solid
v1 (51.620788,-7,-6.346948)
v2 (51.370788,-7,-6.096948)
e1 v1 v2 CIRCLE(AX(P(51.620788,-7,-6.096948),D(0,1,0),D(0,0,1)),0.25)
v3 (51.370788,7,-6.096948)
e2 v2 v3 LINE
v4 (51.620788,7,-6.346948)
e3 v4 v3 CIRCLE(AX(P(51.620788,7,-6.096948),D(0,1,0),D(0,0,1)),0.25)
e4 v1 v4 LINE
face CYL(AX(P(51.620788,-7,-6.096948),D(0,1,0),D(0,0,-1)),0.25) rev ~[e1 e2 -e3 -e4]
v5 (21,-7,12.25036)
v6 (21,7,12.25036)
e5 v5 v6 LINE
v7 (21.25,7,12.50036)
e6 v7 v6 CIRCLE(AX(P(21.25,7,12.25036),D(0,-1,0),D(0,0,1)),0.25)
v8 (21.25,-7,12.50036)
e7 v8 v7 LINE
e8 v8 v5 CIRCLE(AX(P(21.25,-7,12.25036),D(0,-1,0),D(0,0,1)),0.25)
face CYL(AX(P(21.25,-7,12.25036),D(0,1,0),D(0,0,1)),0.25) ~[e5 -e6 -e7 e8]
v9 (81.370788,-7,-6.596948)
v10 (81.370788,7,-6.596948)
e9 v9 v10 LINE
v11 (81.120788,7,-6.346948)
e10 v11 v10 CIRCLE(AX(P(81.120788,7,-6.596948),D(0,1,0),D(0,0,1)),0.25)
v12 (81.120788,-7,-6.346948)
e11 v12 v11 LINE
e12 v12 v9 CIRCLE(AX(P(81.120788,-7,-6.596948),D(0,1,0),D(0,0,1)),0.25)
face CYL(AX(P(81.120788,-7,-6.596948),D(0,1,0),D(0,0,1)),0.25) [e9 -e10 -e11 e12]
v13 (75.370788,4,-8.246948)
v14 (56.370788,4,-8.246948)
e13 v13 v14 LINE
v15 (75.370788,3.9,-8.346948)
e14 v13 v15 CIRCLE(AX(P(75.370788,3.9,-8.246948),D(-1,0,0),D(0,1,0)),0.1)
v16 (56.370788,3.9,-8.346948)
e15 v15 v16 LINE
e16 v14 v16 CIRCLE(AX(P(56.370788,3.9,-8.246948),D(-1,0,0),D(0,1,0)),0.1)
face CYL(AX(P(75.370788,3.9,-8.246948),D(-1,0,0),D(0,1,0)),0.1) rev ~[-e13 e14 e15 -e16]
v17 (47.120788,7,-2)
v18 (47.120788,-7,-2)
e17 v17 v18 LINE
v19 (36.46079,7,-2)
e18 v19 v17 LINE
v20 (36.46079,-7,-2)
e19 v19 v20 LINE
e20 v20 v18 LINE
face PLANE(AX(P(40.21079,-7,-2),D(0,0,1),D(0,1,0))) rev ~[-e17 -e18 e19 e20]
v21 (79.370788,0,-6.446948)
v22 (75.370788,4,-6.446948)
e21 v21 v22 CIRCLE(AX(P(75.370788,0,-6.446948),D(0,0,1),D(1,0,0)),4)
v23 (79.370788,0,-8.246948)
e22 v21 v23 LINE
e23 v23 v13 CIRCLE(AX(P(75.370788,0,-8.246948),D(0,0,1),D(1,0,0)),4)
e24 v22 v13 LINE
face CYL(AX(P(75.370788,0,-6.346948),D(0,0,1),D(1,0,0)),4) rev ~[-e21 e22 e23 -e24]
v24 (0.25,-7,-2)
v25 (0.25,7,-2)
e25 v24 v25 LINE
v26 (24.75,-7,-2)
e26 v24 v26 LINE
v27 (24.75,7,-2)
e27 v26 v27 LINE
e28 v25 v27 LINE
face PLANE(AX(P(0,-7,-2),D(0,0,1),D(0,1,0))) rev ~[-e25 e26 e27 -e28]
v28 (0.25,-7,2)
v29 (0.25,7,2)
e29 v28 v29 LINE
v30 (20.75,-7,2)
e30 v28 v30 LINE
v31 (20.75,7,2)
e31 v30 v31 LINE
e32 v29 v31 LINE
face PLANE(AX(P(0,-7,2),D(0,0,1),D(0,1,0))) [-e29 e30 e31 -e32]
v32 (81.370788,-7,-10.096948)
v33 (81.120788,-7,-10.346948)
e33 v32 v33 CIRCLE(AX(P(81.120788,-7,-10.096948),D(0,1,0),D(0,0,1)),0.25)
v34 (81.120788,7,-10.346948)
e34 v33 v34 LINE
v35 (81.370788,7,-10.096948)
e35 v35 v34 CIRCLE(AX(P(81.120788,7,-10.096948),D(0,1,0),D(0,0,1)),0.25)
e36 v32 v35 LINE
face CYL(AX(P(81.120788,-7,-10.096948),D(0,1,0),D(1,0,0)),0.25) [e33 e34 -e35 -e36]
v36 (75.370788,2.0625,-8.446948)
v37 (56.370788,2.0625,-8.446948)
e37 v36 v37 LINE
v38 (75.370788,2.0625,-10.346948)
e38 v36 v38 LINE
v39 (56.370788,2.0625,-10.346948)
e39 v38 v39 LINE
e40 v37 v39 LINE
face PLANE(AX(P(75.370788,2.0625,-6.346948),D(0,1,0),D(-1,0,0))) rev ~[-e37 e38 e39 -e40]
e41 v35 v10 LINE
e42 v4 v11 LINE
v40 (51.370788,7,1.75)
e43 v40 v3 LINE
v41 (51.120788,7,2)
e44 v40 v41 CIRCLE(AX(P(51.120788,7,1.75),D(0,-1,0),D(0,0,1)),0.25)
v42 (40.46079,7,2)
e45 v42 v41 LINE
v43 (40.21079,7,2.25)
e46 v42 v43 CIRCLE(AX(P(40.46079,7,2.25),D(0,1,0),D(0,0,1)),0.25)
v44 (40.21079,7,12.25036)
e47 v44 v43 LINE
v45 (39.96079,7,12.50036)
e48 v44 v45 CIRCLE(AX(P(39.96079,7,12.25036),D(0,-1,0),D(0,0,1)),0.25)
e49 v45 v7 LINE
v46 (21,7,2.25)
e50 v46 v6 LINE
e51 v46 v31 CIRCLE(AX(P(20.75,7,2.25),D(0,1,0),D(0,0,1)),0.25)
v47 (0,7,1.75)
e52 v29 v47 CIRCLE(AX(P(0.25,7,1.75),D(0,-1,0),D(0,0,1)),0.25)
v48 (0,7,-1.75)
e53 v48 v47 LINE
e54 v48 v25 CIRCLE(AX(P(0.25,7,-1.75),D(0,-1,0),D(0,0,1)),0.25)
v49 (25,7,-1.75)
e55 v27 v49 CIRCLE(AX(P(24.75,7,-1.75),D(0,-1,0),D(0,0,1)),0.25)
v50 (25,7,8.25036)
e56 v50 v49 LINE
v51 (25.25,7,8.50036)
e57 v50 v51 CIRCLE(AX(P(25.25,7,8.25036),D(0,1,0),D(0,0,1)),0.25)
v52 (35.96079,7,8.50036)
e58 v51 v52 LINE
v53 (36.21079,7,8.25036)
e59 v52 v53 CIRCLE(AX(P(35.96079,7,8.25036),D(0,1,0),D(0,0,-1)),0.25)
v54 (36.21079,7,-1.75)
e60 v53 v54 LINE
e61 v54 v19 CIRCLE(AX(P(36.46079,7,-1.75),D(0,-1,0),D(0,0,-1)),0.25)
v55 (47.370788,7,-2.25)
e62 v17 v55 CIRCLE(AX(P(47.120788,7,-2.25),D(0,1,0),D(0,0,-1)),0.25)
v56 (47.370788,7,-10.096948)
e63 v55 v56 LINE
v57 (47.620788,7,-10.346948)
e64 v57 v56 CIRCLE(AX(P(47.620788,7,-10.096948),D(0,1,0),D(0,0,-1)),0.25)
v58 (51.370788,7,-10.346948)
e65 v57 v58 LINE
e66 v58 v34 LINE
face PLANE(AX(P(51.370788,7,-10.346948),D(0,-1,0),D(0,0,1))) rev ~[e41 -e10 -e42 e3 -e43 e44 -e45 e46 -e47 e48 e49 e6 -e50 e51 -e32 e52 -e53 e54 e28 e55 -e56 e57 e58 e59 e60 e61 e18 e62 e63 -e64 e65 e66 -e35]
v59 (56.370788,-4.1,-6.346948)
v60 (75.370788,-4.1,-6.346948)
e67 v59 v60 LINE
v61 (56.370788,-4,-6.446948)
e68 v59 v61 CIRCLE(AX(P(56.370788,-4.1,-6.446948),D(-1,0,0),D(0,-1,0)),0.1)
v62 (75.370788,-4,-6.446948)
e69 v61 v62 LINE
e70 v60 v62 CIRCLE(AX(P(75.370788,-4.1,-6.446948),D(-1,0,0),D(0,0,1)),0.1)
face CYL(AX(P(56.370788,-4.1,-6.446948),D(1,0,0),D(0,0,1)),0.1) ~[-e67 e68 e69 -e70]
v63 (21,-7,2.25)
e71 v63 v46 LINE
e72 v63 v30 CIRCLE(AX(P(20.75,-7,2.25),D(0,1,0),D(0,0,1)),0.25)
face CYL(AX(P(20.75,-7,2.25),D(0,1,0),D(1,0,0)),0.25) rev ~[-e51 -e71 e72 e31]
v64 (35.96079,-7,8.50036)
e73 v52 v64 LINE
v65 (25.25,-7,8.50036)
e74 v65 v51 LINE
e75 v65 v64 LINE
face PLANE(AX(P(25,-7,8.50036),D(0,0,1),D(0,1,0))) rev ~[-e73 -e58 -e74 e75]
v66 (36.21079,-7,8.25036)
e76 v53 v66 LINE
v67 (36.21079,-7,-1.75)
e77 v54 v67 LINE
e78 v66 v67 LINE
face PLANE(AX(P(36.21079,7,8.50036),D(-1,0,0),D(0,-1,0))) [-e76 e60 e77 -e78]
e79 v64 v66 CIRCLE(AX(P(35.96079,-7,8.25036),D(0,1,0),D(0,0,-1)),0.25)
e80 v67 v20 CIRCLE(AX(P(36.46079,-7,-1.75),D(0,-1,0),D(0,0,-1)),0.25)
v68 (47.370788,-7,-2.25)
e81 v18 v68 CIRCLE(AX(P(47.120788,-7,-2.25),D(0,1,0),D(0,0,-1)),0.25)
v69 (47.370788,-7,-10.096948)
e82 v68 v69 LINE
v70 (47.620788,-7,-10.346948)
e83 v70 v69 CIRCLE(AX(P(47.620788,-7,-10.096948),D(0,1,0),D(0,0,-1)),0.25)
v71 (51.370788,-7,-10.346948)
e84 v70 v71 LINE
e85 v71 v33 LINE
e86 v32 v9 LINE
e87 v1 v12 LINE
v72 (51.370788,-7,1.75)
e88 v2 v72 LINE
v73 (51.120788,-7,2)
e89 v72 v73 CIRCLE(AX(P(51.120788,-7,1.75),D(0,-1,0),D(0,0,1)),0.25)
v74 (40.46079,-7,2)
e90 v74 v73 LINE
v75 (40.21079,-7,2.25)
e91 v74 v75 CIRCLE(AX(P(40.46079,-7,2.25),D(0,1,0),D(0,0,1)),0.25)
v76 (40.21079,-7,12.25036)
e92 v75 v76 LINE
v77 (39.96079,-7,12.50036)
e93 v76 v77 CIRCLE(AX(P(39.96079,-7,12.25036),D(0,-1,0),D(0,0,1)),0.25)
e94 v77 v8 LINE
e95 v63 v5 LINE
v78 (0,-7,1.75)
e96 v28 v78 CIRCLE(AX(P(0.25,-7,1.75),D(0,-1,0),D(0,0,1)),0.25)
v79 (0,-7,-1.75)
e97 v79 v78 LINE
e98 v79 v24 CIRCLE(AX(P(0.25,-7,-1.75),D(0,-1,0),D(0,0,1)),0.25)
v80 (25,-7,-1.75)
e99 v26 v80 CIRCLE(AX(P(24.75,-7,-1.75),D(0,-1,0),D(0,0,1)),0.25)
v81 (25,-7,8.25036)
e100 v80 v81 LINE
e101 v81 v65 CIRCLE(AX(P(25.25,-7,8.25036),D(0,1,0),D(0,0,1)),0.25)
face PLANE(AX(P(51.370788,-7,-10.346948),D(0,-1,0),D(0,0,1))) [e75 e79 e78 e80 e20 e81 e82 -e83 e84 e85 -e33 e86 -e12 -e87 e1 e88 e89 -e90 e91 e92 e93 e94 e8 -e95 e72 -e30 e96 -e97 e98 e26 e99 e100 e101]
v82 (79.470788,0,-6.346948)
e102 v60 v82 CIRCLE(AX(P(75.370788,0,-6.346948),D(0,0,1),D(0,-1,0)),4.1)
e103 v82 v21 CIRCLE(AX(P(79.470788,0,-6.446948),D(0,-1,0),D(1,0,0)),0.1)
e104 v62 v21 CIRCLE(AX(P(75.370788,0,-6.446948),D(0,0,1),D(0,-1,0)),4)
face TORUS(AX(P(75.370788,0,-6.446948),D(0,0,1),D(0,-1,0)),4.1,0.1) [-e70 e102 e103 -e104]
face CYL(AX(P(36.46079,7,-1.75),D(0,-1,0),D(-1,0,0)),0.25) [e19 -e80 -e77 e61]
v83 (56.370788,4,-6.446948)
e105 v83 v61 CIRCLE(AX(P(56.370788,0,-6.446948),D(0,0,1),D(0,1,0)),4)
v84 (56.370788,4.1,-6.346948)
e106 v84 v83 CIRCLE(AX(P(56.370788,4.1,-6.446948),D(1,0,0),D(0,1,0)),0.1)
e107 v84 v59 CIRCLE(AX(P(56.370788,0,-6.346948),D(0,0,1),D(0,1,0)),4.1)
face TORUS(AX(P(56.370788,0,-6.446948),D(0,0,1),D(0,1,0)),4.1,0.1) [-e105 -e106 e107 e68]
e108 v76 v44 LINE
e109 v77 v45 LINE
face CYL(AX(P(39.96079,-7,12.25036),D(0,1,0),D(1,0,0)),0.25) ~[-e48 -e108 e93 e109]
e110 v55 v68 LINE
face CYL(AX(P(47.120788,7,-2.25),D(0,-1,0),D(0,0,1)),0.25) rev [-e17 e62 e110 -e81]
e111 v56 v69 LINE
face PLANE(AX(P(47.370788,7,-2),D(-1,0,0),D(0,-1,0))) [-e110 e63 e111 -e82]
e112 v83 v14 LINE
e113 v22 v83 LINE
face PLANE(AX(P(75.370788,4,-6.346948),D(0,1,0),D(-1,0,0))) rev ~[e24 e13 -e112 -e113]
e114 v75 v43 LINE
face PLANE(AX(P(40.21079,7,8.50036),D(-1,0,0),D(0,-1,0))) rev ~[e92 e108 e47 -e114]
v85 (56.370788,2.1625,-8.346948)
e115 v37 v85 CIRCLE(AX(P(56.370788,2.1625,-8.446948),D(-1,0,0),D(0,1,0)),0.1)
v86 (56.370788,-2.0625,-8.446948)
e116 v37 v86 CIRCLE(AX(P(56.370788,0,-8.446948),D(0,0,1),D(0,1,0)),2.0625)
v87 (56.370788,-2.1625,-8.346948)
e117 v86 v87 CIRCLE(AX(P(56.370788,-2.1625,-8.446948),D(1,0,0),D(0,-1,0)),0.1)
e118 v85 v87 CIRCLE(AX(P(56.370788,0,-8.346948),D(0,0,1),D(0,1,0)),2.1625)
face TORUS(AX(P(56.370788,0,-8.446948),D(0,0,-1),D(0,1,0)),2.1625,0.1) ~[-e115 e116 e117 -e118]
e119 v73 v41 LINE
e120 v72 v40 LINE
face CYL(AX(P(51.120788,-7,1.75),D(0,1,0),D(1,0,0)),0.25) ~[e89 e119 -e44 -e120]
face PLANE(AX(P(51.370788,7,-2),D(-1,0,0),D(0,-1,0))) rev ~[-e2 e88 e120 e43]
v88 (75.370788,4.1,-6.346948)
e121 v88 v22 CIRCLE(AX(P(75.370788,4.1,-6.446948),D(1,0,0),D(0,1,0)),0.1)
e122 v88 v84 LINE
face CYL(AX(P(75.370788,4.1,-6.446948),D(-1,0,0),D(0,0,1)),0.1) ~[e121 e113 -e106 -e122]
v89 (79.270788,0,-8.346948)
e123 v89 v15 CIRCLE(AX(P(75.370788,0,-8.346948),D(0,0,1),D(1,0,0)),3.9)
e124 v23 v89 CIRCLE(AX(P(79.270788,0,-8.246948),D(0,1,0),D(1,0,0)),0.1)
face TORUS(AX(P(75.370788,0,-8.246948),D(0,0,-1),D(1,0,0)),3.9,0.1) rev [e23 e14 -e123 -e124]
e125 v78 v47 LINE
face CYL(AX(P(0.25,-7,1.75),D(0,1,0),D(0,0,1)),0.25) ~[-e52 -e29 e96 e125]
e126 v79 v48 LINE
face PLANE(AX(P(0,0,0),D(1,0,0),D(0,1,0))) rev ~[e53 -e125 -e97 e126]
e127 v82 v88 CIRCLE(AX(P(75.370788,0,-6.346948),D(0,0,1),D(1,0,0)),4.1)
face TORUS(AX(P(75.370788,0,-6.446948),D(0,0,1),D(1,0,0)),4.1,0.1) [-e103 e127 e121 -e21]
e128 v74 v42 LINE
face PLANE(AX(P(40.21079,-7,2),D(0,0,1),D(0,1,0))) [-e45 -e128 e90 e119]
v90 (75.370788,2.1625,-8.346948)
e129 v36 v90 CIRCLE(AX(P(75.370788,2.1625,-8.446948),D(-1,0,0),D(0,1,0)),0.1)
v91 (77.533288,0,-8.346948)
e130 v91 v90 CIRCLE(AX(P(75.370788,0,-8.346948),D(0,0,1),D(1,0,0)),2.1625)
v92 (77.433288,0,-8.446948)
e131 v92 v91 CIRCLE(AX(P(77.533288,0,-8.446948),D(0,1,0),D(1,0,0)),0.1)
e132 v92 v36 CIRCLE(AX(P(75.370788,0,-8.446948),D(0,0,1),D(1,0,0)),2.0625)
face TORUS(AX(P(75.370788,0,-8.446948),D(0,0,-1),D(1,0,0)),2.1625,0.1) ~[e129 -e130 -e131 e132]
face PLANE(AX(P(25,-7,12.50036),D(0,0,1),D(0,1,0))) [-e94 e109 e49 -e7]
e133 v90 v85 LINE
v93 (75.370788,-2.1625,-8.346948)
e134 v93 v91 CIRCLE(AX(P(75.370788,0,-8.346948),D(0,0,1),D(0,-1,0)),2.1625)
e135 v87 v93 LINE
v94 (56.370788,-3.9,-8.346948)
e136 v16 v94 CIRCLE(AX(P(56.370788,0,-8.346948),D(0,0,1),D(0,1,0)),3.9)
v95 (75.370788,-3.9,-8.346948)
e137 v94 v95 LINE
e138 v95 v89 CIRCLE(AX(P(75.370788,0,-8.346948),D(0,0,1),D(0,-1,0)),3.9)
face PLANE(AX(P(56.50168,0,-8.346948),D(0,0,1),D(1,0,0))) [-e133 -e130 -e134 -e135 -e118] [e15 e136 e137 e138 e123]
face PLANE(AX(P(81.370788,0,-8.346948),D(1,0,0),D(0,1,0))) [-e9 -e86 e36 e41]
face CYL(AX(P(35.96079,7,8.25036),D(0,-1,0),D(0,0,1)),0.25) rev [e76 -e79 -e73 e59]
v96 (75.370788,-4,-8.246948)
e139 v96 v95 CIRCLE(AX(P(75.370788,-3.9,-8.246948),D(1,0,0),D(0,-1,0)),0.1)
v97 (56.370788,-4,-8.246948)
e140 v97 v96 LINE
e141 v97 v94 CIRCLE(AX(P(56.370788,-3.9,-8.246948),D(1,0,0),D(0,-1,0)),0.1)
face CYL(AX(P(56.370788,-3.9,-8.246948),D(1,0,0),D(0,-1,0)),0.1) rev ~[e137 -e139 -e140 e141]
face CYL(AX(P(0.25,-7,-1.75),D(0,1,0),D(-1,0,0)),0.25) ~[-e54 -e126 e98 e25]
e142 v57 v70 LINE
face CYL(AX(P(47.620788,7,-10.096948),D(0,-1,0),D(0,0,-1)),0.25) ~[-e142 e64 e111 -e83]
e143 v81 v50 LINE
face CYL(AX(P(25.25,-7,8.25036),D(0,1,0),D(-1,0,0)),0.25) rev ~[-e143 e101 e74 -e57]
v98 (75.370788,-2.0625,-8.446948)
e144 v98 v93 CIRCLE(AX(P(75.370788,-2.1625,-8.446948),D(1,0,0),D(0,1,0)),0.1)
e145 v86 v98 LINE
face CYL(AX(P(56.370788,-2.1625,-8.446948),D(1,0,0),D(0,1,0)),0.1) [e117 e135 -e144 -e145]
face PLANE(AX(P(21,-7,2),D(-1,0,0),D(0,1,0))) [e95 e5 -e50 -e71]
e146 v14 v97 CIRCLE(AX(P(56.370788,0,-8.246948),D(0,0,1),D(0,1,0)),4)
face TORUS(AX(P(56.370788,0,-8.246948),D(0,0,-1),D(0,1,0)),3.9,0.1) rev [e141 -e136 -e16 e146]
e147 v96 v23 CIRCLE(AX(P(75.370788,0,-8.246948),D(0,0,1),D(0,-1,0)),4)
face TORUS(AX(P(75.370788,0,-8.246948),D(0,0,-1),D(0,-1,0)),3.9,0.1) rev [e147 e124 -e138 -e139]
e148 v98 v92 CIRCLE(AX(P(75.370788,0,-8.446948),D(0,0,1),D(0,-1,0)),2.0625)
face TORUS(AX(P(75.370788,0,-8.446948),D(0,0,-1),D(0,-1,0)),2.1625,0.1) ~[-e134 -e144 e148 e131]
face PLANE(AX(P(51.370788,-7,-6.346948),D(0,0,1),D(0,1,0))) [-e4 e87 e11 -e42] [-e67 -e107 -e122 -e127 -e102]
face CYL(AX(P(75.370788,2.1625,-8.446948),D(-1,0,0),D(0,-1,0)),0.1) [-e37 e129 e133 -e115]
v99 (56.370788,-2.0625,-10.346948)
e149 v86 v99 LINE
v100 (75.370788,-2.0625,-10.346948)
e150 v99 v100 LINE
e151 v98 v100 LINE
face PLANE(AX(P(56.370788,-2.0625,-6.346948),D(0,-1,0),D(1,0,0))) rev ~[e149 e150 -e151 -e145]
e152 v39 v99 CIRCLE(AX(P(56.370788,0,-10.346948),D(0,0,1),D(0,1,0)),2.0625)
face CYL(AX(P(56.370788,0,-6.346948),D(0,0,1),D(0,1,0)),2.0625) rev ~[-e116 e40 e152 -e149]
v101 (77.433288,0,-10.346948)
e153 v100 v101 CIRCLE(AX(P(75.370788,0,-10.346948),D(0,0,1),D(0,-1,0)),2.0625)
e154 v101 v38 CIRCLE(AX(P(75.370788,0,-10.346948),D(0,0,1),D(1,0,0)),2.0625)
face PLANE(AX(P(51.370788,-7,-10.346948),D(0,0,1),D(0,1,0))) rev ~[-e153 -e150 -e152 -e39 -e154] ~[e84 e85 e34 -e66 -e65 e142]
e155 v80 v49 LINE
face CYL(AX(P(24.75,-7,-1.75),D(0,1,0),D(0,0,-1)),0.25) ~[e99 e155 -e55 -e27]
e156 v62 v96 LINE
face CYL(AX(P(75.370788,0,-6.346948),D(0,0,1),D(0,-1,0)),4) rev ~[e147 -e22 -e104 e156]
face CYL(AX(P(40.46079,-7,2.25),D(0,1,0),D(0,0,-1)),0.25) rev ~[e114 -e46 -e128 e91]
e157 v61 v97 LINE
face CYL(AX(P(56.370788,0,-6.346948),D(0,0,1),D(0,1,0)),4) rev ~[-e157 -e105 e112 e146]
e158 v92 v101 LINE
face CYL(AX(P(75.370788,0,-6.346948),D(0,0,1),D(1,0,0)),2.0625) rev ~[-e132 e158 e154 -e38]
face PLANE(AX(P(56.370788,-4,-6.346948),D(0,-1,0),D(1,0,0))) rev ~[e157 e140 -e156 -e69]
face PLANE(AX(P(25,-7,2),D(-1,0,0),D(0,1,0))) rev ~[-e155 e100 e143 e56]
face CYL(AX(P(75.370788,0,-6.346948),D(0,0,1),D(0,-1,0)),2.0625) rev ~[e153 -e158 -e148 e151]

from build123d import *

# Parameters (mm, degrees)
F0_W      = 14
F0_H      = 4
F1_DEPTH  = 25
F2_W      = 4
F2_H      = 14
F3_DEPTH  = 10.50036
F4_W      = 14
F4_H      = 4
F5_DEPTH  = 15.21079
F6_W      = 4
F6_H      = 14
F7_DEPTH  = 10.50036
F8_W      = 14
F8_H      = 4
F9_DEPTH  = 11.159998
F10_W     = 4
F10_H     = 14
F11_DEPTH = 8.346948
F12_W     = 14
F12_H     = 4
F13_DEPTH = 30
F15_DEPTH = 3.9999999999
F17_DEPTH = 2
F18_R     = 0.1
F19_R     = 0.25


with BuildPart() as f1:
    # F0 (on Right) → F1 (new body)
    with BuildSketch(Plane.YZ):
        Rectangle(F0_W, F0_H)
    extrude(amount=F1_DEPTH)

    # F2 (on face) → F3 (join)
    with BuildSketch(Plane.XY.offset(2)):
        with Locations((23, 0)):
            Rectangle(F2_W, F2_H)
    extrude(amount=F3_DEPTH)

    # F4 (on face) → F5 (join)
    with BuildSketch(Plane.YZ.offset(25)):
        with Locations((0, 10.50036)):
            Rectangle(F4_W, F4_H)
    extrude(amount=F5_DEPTH)

    # F6 (on face) → F7 (join, through all)
    with BuildSketch(Plane(origin=(0, 0, 8.50036), x_dir=(1, 0, 0), z_dir=(0, 0, -1))):
        with Locations((38.21079, 0)):
            Rectangle(F6_W, F6_H)
    extrude(amount=F7_DEPTH)

    # F8 (on face) → F9 (join)
    with BuildSketch(Plane.YZ.offset(40.21079)):
        Rectangle(F8_W, F8_H)
    extrude(amount=F9_DEPTH)

    # F10 (on face) → F11 (join)
    with BuildSketch(Plane(origin=(0, 0, -2), x_dir=(1, 0, 0), z_dir=(0, 0, -1))):
        with Locations((49.370788, 0)):
            Rectangle(F10_W, F10_H)
    extrude(amount=F11_DEPTH)

    # F12 (on face) → F13 (join)
    with BuildSketch(Plane.YZ.offset(51.370788)):
        with Locations((0, -8.3469480001)):
            Rectangle(F12_W, F12_H)
    extrude(amount=F13_DEPTH)

    # F14 (on face) → F15 (cut, through all)
    with BuildSketch(Plane.XY.offset(-6.3469480001)):
        with BuildLine():
            ThreePointArc((56.370788, -2.0625), (57.8291957362, -1.4584077362), (58.433288, 0))
            ThreePointArc((58.433288, 0), (57.8291957362, 1.4584077362), (56.370788, 2.0625))
            ThreePointArc((56.370788, 2.0625), (54.308288, 0), (56.370788, -2.0625))
        make_face()
        with BuildLine():
            ThreePointArc((56.370788, 2.0625), (57.8291957362, 1.4584077362), (58.433288, 0))
            ThreePointArc((58.433288, 0), (57.8291957362, -1.4584077362), (56.370788, -2.0625))
            Line((56.370788, -2.0625), (75.370788, -2.0625))
            ThreePointArc((75.370788, -2.0625), (73.308288, 0), (75.370788, 2.0625))
            Line((75.370788, 2.0625), (56.370788, 2.0625))
        make_face()
        with BuildLine():
            ThreePointArc((77.433288, 0), (76.8291957362, 1.4584077362), (75.370788, 2.0625))
            ThreePointArc((75.370788, 2.0625), (73.308288, 0), (75.370788, -2.0625))
            ThreePointArc((75.370788, -2.0625), (76.8291957362, -1.4584077362), (77.433288, 0))
        make_face()
    extrude(amount=-F15_DEPTH, mode=Mode.SUBTRACT)

    # F16 (on face) → F17 (cut)
    with BuildSketch(Plane.XY.offset(-6.3469480001)):
        with BuildLine():
            ThreePointArc((56.370788, -4), (59.1992151247, -2.8284271247), (60.370788, 0))
            ThreePointArc((60.370788, 0), (59.1992151247, 2.8284271247), (56.370788, 4))
            ThreePointArc((56.370788, 4), (52.370788, 0), (56.370788, -4))
        make_face()
        with BuildLine():
            ThreePointArc((56.370788, 4), (59.1992151247, 2.8284271247), (60.370788, 0))
            ThreePointArc((60.370788, 0), (59.1992151247, -2.8284271247), (56.370788, -4))
            Line((56.370788, -4), (75.370788, -4))
            ThreePointArc((75.370788, -4), (71.370788, 0), (75.370788, 4))
            Line((75.370788, 4), (56.370788, 4))
        make_face()
        with BuildLine():
            ThreePointArc((79.370788, 0), (78.1992151247, 2.8284271247), (75.370788, 4))
            ThreePointArc((75.370788, 4), (71.370788, 0), (75.370788, -4))
            ThreePointArc((75.370788, -4), (78.1992151247, -2.8284271247), (79.370788, 0))
        make_face()
    extrude(amount=-F17_DEPTH, mode=Mode.SUBTRACT)

    # F18
    f18_edges = [f1.edges().sort_by_distance(p)[0] for p in [
        (52.370788, 0, -6.346948),
        (65.870788, 4, -6.346948),
        (79.370788, 0, -6.346948),
        (65.870788, -4, -6.346948),
        (65.870788, 4, -8.346948),
        (52.370788, 0, -8.346948),
        (54.308288, 0, -8.346948),
        (65.870788, 2.0625, -8.346948),
        (77.433288, 0, -8.346948),
        (79.370788, 0, -8.346948),
        (65.870788, -4, -8.346948),
        (65.870788, -2.0625, -8.346948),
    ]]
    fillet(f18_edges, radius=F18_R)

    # F19
    f19_edges = [f1.edges().sort_by_distance(p)[0] for p in [
        (51.370788, 0, -6.346948),
        (51.370788, 0, 2),
        (40.21079, 0, 2),
        (40.21079, 0, 12.50036),
        (21, 0, 2),
        (21, 0, 12.50036),
        (0, 0, 2),
        (0, 0, -2),
        (25, 0, -2),
        (25, 0, 8.50036),
        (36.21079, 0, 8.50036),
        (47.370788, 0, -2),
        (47.370788, 0, -10.346948),
        (81.370788, 0, -10.346948),
        (81.370788, 0, -6.346948),
        (36.21079, 0, -2),
    ]]
    fillet(f19_edges, radius=F19_R)


solid = f1.part
